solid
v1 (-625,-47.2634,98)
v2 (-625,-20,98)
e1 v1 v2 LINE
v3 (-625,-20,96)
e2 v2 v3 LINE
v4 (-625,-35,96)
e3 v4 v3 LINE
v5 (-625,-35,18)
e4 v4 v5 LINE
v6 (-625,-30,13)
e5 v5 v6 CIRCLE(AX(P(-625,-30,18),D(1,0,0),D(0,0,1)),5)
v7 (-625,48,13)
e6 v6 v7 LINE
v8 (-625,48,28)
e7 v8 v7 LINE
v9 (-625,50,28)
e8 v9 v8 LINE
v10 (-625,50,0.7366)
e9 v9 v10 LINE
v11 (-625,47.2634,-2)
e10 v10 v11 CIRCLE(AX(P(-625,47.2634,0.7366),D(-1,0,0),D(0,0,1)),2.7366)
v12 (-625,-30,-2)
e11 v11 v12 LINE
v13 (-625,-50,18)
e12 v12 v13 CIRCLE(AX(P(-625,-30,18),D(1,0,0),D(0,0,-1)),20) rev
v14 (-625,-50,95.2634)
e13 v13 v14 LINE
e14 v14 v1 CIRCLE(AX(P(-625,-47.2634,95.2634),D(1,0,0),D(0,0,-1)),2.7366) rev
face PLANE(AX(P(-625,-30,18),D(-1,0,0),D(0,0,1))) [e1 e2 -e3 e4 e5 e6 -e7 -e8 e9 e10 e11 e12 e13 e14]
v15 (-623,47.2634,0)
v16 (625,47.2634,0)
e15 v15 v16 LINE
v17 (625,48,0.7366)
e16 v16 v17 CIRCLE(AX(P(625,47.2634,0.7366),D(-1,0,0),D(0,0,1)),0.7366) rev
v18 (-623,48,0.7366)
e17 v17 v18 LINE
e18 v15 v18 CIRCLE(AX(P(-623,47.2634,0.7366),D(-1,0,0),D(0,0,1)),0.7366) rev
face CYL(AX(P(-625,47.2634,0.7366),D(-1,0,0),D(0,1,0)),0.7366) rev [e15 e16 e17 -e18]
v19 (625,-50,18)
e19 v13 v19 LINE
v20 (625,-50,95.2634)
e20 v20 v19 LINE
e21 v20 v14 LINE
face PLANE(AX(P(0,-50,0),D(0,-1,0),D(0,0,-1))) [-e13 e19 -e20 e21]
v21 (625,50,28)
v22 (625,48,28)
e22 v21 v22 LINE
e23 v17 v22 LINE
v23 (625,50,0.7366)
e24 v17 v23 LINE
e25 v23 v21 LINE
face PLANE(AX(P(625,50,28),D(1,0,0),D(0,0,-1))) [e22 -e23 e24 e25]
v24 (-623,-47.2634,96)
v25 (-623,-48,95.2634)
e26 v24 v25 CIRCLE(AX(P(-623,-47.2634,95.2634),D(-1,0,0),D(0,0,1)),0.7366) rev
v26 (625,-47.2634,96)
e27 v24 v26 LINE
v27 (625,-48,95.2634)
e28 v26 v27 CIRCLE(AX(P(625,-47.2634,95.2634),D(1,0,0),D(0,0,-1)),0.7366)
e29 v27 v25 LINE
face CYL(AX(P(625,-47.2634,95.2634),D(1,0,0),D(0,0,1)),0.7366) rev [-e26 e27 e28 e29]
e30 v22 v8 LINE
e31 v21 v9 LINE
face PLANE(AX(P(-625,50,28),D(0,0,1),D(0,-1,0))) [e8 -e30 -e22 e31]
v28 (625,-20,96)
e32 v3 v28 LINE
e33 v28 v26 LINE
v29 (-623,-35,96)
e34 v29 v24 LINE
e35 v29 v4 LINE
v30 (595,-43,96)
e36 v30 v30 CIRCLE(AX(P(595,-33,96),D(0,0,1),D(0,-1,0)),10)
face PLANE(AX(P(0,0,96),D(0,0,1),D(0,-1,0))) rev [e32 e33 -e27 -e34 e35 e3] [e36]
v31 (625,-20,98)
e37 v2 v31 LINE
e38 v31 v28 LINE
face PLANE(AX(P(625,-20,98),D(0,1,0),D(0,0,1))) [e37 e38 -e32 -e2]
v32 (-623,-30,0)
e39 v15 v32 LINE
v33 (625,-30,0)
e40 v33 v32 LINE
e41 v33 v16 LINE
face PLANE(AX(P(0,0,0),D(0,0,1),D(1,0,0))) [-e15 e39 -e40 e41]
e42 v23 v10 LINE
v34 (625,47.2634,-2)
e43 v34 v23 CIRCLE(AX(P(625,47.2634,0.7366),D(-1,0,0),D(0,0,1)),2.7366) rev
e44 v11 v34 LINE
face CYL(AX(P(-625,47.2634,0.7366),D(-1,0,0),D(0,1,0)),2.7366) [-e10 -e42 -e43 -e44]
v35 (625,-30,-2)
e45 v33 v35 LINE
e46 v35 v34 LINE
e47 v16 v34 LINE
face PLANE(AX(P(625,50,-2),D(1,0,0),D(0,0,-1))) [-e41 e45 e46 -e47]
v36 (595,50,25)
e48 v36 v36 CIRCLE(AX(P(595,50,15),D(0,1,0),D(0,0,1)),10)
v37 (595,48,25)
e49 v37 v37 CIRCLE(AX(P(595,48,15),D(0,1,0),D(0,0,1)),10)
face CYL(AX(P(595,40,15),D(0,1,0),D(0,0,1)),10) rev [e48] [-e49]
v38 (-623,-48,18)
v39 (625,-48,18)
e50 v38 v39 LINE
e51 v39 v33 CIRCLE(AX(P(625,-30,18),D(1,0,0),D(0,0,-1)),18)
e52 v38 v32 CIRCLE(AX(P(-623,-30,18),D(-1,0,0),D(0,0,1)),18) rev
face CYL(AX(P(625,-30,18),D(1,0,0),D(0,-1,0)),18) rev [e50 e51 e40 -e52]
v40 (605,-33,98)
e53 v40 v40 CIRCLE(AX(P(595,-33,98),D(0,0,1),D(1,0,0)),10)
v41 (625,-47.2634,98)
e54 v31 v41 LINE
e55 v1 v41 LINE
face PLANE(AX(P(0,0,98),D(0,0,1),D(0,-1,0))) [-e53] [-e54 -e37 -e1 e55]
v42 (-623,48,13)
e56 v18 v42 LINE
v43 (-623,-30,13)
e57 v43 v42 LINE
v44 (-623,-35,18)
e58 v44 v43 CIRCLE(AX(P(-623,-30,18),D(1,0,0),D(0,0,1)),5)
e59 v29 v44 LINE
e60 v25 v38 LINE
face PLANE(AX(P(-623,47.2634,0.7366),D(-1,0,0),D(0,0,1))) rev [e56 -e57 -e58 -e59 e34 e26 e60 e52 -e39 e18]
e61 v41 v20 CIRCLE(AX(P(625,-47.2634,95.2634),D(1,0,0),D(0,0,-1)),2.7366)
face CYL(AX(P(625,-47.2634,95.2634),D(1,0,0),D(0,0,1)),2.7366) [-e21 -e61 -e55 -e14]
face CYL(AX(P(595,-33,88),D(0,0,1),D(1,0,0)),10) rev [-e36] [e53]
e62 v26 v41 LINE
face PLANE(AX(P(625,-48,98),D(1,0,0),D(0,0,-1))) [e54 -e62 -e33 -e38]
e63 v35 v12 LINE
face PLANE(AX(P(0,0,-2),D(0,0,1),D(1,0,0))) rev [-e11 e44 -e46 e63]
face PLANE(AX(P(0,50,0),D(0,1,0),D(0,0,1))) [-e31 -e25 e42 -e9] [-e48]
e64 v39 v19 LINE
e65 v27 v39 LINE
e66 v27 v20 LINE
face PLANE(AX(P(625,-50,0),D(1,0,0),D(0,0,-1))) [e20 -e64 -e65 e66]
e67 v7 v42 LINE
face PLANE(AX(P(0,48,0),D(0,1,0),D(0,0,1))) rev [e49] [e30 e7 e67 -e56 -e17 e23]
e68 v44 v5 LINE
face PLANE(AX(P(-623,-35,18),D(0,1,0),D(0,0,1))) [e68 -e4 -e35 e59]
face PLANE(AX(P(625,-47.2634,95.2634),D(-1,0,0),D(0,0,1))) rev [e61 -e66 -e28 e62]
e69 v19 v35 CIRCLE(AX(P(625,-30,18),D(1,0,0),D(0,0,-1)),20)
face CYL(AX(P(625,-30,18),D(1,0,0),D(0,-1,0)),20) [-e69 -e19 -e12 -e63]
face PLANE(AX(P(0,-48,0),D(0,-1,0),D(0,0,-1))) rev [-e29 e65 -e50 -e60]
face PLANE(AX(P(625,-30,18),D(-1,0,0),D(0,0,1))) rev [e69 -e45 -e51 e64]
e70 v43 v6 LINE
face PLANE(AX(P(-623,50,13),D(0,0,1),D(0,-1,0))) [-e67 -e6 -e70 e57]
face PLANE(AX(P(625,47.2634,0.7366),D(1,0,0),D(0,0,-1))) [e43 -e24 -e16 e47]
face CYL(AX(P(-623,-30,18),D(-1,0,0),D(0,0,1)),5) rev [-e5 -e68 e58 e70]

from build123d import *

# Parameters (mm, degrees)
SKETCH_2_W                       = 1250
SKETCH_2_H                       = 100
SM_BASE_FLANGE_1_DEPTH           = 2
SM_EDGE_FLANGE_1_STRIP_W         = 44
SM_EDGE_FLANGE_1_STRIP_H         = 2
SM_EDGE_FLANGE_1_STRIP_CUT_DEPTH = 1250
SM_EDGE_FLANGE_1_DEPTH           = 1250
SM_EDGE_FLANGE_2_STRIP_W         = 9.4732
SM_EDGE_FLANGE_2_STRIP_H         = 2
SM_EDGE_FLANGE_2_STRIP_CUT_DEPTH = 1250
SM_EDGE_FLANGE_2_DEPTH           = 1250
SM_EDGE_FLANGE_3_STRIP_W         = 9.4732
SM_EDGE_FLANGE_3_STRIP_H         = 2
SM_EDGE_FLANGE_3_STRIP_CUT_DEPTH = 1250
SM_EDGE_FLANGE_3_DEPTH           = 1250
SKETCH_16_R                      = 10
CUT_EXTRUDE_1_DEPTH              = 10
SKETCH_17_R                      = 10
CUT_EXTRUDE_2_DEPTH              = 10
EXTRUDE_1_DEPTH                  = 2


# Sheet-metal steps are written as plain solids
with BuildPart() as part:
    # Sketch 2 → 基体-法兰1 (new body)
    with BuildSketch(Plane.XY):
        Rectangle(SKETCH_2_W, SKETCH_2_H)
    extrude(amount=-SM_BASE_FLANGE_1_DEPTH)

    # 边线-法兰1 strip (across the edge) → 边线-法兰1 strip cut (cut)
    with BuildSketch(Plane(origin=(-625, -50, 0), x_dir=(0, 1, 0), z_dir=(1, 0, 0))):
        with Locations((-2, -1)):
            Rectangle(SM_EDGE_FLANGE_1_STRIP_W, SM_EDGE_FLANGE_1_STRIP_H)
    extrude(amount=SM_EDGE_FLANGE_1_STRIP_CUT_DEPTH, mode=Mode.SUBTRACT)

    # 边线-法兰1 section (across the edge) → 边线-法兰1 (add)
    with BuildSketch(Plane(origin=(-625, -50, 0), x_dir=(0, 1, 0), z_dir=(1, 0, 0))):
        with BuildLine():
            Line((0, 18), (0, 98))
            Line((0, 98), (2, 98))
            Line((2, 98), (2, 18))
            ThreePointArc((2, 18), (7.272077939, 5.272077939), (20, 0))
            Line((20, 0), (20, -2))
            ThreePointArc((20, -2), (5.857864376, 3.857864376), (0, 18))
        make_face()
    extrude(amount=SM_EDGE_FLANGE_1_DEPTH)

    # 边线-法兰2 strip (across the edge) → 边线-法兰2 strip cut (cut)
    with BuildSketch(Plane(origin=(625, 50, 0), x_dir=(0, -1, 0), z_dir=(-1, 0, 0))):
        with Locations((-2, -1)):
            Rectangle(SM_EDGE_FLANGE_2_STRIP_W, SM_EDGE_FLANGE_2_STRIP_H)
    extrude(amount=SM_EDGE_FLANGE_2_STRIP_CUT_DEPTH, mode=Mode.SUBTRACT)

    # 边线-法兰2 section (across the edge) → 边线-法兰2 (add)
    with BuildSketch(Plane(origin=(625, 50, 0), x_dir=(0, -1, 0), z_dir=(-1, 0, 0))):
        with BuildLine():
            Line((0, 0.7366), (0, 28))
            Line((0, 28), (2, 28))
            Line((2, 28), (2, 0.7366))
            ThreePointArc((2, 0.7366), (2.215745145, 0.215745145), (2.7366, 0))
            Line((2.7366, 0), (2.7366, -2))
            ThreePointArc((2.7366, -2), (0.801531583, -1.198468417), (0, 0.7366))
        make_face()
    extrude(amount=SM_EDGE_FLANGE_2_DEPTH)

    # 边线-法兰3 strip (across the edge) → 边线-法兰3 strip cut (cut)
    with BuildSketch(Plane(origin=(-625, -48, 98), x_dir=(0, 0, -1), z_dir=(1, 0, 0))):
        with Locations((-2, -1)):
            Rectangle(SM_EDGE_FLANGE_3_STRIP_W, SM_EDGE_FLANGE_3_STRIP_H)
    extrude(amount=SM_EDGE_FLANGE_3_STRIP_CUT_DEPTH, mode=Mode.SUBTRACT)

    # 边线-法兰3 section (across the edge) → 边线-法兰3 (add)
    with BuildSketch(Plane(origin=(-625, -48, 98), x_dir=(0, 0, -1), z_dir=(1, 0, 0))):
        with BuildLine():
            Line((0, 0.7366), (0, 28))
            Line((0, 28), (2, 28))
            Line((2, 28), (2, 0.7366))
            ThreePointArc((2, 0.7366), (2.215745145, 0.215745145), (2.7366, 0))
            Line((2.7366, 0), (2.7366, -2))
            ThreePointArc((2.7366, -2), (0.801531583, -1.198468417), (0, 0.7366))
        make_face()
    extrude(amount=SM_EDGE_FLANGE_3_DEPTH)

    # 草图16 → 切除-拉伸1 (cut)
    with BuildSketch(Plane(origin=(0, 50, 0), x_dir=(1, 0, 0), z_dir=(0, 1, 0))):
        with Locations(Location((595, -15, 0), (0, 0, 270))):
            Circle(SKETCH_16_R)
    extrude(amount=-CUT_EXTRUDE_1_DEPTH, mode=Mode.SUBTRACT)

    # 草图17 → 切除-拉伸2 (cut)
    with BuildSketch(Plane.XY.offset(98)):
        with Locations((595, -33)):
            Circle(SKETCH_17_R)
    extrude(amount=-CUT_EXTRUDE_2_DEPTH, mode=Mode.SUBTRACT)

    # 草图30 → 凸台-拉伸1 (add)
    with BuildSketch(Plane.ZY.offset(625)):
        with BuildLine():
            Line((13, 50), (0.7366, 50))
            ThreePointArc((0.7366, 50), (-1.198468417, 49.198468417), (-2, 47.2634))
            Line((-2, 47.2634), (-2, -30))
            ThreePointArc((-2, -30), (3.857864376, -44.142135624), (18, -50))
            Line((18, -50), (95.2634, -50))
            ThreePointArc((95.2634, -50), (97.198468417, -49.198468417), (98, -47.2634))
            Line((98, -47.2634), (98, -35))
            Line((98, -35), (18, -35))
            ThreePointArc((18, -35), (14.464466094, -33.535533906), (13, -30))
            Line((13, -30), (13, 50))
        make_face()
    extrude(amount=-EXTRUDE_1_DEPTH)


solid = part.part
